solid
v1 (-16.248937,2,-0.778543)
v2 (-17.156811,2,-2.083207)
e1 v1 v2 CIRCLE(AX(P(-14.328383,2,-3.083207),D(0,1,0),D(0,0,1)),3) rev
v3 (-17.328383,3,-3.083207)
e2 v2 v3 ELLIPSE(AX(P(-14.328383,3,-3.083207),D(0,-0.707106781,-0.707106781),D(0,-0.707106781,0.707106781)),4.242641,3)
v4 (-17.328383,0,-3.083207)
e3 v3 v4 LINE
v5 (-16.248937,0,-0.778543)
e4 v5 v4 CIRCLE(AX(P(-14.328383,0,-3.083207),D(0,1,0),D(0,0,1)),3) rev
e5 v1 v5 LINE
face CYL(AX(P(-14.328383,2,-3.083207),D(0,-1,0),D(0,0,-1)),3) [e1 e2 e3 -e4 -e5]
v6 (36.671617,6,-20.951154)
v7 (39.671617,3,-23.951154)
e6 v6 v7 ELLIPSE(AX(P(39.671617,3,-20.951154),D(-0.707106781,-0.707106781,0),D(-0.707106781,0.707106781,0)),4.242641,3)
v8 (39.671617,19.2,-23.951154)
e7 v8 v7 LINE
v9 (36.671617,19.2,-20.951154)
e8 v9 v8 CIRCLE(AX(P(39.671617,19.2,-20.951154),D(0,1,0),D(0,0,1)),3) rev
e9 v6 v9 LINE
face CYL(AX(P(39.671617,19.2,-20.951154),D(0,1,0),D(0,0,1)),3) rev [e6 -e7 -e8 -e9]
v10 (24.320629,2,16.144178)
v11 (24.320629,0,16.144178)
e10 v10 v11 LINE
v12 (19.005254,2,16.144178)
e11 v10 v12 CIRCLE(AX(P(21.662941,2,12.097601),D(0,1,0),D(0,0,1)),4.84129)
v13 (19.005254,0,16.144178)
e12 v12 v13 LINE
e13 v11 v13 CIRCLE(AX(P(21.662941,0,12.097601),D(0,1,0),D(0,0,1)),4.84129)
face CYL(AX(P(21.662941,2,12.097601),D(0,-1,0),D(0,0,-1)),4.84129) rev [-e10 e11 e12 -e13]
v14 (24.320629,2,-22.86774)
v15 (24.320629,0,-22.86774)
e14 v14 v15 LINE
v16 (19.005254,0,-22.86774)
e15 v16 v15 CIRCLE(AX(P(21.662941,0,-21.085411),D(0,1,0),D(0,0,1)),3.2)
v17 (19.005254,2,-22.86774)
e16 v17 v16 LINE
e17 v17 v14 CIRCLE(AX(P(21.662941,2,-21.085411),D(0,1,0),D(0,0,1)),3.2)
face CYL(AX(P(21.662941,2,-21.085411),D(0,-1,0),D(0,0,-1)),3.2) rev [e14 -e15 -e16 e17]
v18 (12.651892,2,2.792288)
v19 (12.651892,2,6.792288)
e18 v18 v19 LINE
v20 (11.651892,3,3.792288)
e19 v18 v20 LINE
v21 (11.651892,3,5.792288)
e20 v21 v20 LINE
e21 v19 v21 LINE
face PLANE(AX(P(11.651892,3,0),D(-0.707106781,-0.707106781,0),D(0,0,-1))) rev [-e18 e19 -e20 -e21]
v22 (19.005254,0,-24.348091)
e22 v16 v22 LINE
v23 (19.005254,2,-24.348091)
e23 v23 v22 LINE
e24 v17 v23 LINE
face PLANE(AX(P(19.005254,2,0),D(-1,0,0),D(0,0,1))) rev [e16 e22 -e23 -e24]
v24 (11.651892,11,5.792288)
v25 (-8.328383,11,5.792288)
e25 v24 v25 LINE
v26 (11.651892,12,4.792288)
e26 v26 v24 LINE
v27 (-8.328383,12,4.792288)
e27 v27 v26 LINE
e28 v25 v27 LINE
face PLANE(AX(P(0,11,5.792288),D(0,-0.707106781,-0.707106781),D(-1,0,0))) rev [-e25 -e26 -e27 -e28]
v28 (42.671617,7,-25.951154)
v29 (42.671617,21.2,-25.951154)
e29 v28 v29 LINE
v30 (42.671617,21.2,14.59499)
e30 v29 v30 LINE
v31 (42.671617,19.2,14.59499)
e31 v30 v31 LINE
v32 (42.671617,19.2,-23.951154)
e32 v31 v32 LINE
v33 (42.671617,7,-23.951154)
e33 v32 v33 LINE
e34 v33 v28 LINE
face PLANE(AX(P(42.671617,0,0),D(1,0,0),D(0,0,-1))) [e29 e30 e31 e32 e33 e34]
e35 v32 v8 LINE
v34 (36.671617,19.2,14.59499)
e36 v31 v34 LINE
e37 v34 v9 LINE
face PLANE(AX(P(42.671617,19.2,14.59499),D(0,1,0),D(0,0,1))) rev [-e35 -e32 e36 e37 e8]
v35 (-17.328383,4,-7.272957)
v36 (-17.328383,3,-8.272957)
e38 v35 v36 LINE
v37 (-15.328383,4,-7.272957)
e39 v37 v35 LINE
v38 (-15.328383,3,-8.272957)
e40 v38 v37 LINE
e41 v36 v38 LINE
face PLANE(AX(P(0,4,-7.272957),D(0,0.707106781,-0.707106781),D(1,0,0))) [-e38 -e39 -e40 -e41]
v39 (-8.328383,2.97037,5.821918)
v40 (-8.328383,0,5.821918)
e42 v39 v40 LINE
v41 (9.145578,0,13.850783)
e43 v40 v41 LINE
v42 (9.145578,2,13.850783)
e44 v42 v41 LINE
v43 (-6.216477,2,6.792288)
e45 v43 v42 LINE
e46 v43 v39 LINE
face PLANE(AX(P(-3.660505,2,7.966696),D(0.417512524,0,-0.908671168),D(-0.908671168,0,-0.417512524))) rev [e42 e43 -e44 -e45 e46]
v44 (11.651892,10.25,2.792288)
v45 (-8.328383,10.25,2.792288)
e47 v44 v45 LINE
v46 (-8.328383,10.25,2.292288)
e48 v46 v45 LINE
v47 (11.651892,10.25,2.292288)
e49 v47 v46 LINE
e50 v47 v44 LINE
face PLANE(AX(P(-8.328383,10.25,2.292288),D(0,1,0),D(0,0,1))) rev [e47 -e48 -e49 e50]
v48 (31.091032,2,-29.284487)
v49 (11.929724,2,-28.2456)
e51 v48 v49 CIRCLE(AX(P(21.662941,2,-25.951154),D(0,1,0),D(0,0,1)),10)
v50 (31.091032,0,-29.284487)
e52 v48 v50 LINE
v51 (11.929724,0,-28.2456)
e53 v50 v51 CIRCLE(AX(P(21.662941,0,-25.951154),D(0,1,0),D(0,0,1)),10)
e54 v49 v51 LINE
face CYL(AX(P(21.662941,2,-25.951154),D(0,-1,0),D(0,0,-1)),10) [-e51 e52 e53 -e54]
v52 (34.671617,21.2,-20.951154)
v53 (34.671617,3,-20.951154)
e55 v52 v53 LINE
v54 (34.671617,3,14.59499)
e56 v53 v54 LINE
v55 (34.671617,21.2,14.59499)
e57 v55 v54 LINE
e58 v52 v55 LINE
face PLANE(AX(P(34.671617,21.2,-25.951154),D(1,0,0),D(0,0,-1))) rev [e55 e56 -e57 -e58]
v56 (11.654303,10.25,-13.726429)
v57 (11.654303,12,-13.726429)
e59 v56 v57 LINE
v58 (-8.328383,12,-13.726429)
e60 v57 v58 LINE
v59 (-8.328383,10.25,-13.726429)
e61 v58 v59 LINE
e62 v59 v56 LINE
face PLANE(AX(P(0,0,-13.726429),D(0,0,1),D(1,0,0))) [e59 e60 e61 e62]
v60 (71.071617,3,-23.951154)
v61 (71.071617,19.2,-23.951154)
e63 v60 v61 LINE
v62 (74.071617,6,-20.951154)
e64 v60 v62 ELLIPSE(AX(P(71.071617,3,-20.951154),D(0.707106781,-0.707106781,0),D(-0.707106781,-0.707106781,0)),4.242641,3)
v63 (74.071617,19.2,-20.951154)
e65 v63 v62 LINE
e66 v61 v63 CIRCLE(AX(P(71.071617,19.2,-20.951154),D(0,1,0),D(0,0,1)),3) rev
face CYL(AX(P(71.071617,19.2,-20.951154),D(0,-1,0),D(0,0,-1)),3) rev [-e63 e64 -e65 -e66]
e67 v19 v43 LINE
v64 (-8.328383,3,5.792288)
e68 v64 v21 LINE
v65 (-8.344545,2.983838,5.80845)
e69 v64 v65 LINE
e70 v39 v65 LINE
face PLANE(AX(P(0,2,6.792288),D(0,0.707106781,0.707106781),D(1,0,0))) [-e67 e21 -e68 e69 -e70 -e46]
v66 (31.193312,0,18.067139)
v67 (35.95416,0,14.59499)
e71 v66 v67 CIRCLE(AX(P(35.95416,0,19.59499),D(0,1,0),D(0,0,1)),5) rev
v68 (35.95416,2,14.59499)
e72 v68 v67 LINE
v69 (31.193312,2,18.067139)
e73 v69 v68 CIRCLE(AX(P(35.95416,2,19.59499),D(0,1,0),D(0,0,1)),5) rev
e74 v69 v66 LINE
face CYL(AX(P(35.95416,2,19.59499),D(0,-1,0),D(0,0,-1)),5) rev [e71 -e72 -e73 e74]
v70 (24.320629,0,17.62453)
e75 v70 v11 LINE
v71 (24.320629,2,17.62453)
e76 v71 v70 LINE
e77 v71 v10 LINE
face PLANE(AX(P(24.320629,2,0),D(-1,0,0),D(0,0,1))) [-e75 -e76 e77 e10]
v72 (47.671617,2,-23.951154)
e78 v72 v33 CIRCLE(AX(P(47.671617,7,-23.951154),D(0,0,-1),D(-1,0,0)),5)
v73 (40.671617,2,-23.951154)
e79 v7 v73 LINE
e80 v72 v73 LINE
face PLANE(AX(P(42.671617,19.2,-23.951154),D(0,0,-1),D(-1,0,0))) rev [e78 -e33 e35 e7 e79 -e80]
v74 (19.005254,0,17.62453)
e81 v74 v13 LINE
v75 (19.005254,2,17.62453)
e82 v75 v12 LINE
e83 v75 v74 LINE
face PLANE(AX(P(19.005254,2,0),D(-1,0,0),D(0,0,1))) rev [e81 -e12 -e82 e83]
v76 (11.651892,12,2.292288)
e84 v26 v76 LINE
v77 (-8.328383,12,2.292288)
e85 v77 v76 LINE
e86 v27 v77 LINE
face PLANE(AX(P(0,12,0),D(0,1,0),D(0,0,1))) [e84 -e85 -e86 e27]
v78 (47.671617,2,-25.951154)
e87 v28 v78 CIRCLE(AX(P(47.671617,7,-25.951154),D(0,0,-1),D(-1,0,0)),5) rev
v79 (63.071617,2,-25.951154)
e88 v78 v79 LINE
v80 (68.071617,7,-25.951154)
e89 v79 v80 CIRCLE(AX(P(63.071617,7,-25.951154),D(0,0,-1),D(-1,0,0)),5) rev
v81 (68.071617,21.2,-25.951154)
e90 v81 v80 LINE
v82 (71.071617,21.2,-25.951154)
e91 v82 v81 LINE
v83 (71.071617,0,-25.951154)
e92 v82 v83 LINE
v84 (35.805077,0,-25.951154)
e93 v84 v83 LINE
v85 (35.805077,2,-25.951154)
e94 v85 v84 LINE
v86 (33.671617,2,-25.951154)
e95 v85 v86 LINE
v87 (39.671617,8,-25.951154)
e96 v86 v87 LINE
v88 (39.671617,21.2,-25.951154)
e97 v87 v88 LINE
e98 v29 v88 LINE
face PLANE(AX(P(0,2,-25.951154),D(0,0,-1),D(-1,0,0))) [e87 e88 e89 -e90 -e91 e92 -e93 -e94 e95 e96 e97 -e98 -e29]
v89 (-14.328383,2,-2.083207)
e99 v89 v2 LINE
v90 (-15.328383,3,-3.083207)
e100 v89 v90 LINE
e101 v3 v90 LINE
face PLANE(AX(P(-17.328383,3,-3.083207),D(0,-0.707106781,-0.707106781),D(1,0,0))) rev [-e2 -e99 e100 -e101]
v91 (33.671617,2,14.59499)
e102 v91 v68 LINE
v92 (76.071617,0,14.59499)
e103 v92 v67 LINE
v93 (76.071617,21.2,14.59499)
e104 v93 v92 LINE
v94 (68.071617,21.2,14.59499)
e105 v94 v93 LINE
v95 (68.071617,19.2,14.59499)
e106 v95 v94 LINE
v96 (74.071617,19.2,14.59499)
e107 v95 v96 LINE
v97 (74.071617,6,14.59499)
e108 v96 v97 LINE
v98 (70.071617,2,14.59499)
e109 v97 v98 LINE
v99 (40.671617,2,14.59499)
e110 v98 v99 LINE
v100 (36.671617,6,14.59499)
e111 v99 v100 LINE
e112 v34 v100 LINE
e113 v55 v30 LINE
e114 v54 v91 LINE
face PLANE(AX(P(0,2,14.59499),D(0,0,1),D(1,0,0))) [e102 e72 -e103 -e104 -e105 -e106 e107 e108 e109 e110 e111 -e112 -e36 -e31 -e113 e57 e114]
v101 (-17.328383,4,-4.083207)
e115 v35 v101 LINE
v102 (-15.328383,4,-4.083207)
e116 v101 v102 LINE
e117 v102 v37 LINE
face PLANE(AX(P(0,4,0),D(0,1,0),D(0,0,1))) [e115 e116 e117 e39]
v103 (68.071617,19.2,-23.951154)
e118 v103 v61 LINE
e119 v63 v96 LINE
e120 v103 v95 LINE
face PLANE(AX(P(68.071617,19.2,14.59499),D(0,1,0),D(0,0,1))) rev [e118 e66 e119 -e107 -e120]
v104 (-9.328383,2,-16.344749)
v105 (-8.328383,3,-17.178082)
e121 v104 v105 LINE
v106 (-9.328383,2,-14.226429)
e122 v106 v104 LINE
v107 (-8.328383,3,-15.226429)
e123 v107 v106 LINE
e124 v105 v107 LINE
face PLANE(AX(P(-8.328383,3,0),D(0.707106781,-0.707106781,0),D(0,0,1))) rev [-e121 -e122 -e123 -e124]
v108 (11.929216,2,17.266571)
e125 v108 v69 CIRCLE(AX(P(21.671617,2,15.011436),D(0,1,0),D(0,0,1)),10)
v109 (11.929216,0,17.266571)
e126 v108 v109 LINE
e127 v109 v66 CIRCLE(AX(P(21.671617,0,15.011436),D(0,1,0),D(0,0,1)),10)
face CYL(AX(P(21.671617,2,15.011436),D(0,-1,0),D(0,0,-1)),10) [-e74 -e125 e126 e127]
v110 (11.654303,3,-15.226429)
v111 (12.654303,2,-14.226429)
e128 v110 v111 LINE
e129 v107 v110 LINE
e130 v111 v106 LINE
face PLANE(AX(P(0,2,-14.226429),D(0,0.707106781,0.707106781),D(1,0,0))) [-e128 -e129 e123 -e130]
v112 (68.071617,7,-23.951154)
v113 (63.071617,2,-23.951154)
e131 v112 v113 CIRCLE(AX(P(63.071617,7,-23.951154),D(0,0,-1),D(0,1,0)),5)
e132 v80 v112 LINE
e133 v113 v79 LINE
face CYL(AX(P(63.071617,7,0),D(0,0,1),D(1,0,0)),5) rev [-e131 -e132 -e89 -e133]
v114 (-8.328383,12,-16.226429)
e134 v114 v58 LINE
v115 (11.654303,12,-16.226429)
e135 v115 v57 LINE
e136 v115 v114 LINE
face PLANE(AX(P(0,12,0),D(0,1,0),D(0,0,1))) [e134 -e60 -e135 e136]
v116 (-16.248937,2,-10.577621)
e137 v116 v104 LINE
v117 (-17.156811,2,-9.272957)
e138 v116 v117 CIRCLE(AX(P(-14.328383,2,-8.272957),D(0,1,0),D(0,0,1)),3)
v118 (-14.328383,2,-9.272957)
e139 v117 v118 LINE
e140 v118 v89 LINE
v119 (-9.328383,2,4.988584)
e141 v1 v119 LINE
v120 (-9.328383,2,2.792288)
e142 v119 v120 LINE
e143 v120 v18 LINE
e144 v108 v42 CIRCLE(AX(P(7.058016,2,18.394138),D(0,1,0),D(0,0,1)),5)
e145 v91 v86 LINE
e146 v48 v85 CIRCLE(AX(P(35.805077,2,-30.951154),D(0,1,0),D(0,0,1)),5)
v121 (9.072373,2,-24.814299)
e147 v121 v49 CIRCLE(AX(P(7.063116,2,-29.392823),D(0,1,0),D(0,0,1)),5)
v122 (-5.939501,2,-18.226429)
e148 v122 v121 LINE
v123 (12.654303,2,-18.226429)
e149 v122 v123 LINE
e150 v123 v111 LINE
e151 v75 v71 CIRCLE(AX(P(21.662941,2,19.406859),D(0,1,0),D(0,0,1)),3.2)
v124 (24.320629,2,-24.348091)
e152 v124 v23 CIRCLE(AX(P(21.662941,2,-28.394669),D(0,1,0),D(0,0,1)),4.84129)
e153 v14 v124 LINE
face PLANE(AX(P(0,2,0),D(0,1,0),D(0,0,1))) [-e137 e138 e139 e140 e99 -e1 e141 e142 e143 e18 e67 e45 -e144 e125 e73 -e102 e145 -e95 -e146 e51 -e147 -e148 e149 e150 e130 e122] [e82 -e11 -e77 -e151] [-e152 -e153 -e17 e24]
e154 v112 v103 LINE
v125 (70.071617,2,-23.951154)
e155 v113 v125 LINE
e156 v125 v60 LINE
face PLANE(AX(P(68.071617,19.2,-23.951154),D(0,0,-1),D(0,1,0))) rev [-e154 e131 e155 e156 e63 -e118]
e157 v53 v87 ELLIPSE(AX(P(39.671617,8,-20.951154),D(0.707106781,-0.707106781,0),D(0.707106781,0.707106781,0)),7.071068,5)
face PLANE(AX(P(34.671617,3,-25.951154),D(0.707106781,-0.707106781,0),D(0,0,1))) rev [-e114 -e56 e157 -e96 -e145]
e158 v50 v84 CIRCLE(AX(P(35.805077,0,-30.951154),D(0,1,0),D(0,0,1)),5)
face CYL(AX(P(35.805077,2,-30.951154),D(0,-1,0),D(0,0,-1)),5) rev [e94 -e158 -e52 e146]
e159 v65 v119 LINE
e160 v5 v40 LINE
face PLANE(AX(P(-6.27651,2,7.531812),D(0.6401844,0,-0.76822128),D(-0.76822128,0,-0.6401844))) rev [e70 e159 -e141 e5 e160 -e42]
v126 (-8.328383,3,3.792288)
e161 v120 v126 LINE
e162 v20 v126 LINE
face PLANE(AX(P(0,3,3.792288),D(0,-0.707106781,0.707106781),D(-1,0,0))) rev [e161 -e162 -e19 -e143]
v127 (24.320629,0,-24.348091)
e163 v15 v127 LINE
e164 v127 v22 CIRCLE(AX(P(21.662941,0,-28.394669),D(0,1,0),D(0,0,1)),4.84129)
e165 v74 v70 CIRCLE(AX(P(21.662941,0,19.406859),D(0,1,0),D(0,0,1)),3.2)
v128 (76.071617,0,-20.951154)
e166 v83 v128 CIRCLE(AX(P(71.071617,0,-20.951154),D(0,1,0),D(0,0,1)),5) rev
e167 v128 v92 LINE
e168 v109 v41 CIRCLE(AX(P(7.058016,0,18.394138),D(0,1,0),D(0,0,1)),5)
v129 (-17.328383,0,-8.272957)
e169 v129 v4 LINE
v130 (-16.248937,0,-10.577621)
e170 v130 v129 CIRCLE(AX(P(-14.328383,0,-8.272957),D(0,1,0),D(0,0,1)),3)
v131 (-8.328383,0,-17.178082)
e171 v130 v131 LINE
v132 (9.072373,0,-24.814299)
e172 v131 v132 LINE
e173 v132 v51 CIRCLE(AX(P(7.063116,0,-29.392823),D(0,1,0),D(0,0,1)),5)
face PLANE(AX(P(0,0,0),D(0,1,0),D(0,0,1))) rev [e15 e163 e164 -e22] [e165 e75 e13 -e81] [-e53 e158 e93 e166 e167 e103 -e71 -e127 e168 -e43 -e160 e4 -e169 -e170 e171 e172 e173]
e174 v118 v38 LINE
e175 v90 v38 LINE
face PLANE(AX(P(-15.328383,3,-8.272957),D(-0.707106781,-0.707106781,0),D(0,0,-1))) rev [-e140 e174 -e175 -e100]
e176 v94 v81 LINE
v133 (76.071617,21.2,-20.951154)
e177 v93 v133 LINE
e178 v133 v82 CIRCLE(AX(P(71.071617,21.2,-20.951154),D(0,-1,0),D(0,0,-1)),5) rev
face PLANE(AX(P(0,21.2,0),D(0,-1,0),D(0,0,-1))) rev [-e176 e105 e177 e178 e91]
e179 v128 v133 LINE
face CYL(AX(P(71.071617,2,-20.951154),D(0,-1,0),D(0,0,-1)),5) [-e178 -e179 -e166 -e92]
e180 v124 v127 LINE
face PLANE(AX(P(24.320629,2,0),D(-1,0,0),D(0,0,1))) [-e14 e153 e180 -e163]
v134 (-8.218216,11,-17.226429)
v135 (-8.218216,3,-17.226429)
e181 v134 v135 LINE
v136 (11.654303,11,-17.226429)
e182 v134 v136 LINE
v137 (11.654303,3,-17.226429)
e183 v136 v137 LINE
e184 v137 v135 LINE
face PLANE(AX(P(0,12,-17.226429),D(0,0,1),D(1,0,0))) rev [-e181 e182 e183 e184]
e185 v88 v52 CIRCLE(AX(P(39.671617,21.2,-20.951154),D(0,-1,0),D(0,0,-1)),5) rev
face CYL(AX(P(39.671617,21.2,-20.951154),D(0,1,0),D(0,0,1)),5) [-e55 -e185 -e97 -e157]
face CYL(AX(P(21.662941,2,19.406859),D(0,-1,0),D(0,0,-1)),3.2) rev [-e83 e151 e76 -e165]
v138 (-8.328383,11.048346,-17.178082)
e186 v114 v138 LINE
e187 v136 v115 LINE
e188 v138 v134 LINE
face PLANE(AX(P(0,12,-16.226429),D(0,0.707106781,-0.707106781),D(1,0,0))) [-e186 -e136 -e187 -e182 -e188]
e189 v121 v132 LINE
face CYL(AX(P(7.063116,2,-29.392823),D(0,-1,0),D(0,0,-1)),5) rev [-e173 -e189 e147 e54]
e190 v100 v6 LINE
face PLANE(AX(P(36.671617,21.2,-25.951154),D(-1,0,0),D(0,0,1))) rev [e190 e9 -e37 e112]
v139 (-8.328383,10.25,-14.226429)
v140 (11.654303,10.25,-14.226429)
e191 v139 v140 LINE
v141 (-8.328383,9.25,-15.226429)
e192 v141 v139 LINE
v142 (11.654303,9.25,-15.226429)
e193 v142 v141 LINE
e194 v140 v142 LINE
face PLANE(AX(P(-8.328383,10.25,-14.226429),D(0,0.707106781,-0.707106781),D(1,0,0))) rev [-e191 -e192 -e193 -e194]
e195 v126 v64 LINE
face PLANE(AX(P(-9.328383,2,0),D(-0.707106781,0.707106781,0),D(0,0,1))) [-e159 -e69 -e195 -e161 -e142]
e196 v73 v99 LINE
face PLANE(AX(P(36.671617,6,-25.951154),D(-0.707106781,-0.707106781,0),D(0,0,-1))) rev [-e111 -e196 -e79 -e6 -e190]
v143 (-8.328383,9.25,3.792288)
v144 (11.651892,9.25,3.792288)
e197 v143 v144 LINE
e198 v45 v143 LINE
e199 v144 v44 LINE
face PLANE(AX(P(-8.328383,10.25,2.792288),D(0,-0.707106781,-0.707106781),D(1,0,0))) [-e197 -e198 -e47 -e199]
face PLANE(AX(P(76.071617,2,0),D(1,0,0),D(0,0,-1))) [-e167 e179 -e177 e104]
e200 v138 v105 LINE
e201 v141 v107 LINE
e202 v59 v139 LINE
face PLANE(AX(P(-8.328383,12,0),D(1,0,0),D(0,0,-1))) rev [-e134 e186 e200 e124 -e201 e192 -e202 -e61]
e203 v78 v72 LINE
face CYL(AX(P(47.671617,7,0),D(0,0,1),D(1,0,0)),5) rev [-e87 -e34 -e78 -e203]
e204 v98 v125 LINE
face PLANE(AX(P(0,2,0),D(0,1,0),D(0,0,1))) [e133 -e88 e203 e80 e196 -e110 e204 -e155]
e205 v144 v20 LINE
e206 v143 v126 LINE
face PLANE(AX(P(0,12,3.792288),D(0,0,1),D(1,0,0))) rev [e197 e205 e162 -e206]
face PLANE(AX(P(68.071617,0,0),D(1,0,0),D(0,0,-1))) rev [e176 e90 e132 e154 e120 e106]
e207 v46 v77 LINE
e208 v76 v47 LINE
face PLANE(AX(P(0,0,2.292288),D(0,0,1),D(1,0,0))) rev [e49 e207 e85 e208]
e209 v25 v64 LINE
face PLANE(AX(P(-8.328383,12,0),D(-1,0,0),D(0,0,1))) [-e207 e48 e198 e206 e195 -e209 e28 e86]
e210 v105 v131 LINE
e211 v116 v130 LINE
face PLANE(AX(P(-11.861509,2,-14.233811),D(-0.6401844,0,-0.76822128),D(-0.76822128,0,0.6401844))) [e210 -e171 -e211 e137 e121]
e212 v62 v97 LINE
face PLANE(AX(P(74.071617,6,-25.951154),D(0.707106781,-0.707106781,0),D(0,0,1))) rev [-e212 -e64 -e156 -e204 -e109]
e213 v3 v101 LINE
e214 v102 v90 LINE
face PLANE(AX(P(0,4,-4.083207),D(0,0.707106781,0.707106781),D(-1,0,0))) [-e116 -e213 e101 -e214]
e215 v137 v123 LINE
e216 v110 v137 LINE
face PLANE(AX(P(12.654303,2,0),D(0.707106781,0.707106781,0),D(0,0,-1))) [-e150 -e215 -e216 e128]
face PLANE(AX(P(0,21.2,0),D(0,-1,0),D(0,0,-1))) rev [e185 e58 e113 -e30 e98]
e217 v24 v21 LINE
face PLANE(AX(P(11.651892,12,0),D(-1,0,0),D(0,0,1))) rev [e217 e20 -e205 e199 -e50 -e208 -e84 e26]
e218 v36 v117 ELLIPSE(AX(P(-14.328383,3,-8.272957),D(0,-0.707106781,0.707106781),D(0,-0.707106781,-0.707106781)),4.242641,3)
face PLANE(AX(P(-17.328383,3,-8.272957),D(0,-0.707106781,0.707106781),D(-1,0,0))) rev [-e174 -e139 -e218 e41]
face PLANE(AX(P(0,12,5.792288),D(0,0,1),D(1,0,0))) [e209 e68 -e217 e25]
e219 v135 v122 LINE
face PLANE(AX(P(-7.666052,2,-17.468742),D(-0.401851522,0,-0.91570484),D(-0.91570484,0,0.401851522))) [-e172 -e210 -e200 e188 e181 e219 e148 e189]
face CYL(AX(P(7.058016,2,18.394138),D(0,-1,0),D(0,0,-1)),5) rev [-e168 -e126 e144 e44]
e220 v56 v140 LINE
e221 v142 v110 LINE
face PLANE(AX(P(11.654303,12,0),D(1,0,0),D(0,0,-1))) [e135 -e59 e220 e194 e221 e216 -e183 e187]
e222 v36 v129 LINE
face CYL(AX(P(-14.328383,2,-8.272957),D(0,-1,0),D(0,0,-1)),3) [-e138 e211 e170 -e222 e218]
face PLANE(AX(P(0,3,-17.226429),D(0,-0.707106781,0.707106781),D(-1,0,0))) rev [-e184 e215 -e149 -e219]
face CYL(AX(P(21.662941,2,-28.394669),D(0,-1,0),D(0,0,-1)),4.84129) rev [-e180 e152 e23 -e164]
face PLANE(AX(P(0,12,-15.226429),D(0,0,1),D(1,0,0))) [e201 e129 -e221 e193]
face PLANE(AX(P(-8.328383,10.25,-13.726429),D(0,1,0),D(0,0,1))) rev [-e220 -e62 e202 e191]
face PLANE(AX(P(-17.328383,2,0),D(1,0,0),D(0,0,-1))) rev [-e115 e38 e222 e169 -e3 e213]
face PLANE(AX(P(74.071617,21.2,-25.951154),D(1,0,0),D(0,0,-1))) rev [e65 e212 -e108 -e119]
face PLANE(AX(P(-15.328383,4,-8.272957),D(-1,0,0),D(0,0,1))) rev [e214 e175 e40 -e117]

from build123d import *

# Parameters (mm, degrees)
BOSS_EXTRUDE3_DEPTH  = 2
SKETCH2_W            = 19.980275276
SKETCH2_H            = 2
BOSS_EXTRUDE4_DEPTH  = 10
SKETCH4_W            = 19.982686102
SKETCH4_H            = 1.75
BOSS_EXTRUDE6_DEPTH  = 1.5
SKETCH5_W            = 19.980275276
SKETCH5_H            = 1.75
BOSS_EXTRUDE7_DEPTH  = 1.5
SKETCH6_W            = 2
SKETCH6_H            = 40.546143633
BOSS_EXTRUDE8_DEPTH  = 19.2
SKETCH7_W            = 40.546143633
SKETCH7_H            = 2
BOSS_EXTRUDE9_DEPTH  = 6
SKETCH8_W            = 40.546143633
SKETCH8_H            = 2
BOSS_EXTRUDE10_DEPTH = 6
SKETCH9_W            = 2
SKETCH9_H            = 17.2
BOSS_EXTRUDE11_DEPTH = 6
SKETCH11_W           = 2
SKETCH11_H           = 17.2
BOSS_EXTRUDE12_DEPTH = 6
CHAMFER3_SIZE        = 1
FILLET6_R            = 3
FILLET12_R           = 5
FILLET13_R           = 5
CHAMFER4_SIZE        = 4
SKETCH12_W           = 2
SKETCH12_H           = 5.189750324
BOSS_EXTRUDE13_DEPTH = 2
CHAMFER5_SIZE        = 1


with BuildPart() as part:
    # Sketch1 → Boss-Extrude3 (new body)
    with BuildSketch(Plane(origin=(0, 0, 0), x_dir=(1, 0, 0), z_dir=(0, 1, 0))):
        with BuildLine():
            Line((-8.328383402, 17.178082192), (-11.926539406, 14.179618856))
            Line((-11.926539406, 14.179618856), (-16.248936601, 10.577621193))
            ThreePointArc((-16.248936601, 10.577621193), (-17.045151666, 9.545423543), (-17.328383402, 8.272957354))
            Line((-17.328383402, 8.272957354), (-17.328383402, 3.08320703))
            ThreePointArc((-17.328383402, 3.08320703), (-17.045151666, 1.810740841), (-16.248936601, 0.778543191))
            Line((-16.248936601, 0.778543191), (-11.926539406, -2.823454472))
            Line((-11.926539406, -2.823454472), (-8.328383402, -5.821917808))
            Line((-8.328383402, -5.821917808), (9.145578492, -13.850782578))
            ThreePointArc((9.145578492, -13.850782578), (10.93396709, -15.23549913), (11.929216114, -17.266571036))
            ThreePointArc((11.929216114, -17.266571036), (21.256400089, -25.002812312), (31.193312026, -18.067138506))
            ThreePointArc((31.193312026, -18.067138506), (33.007912602, -15.555233716), (35.954159741, -14.594989625))
            Line((35.954159741, -14.594989625), (36.671616598, -14.594989625))
            Line((36.671616598, -14.594989625), (76.071616598, -14.594989625))
            Line((76.071616598, -14.594989625), (76.071616598, 25.951154008))
            Line((76.071616598, 25.951154008), (36.671616598, 25.951154008))
            Line((36.671616598, 25.951154008), (35.805077068, 25.951154008))
            ThreePointArc((35.805077068, 25.951154008), (32.918325722, 26.868671104), (31.09103186, 29.284487342))
            ThreePointArc((31.09103186, 29.284487342), (21.121556826, 35.936488389), (11.929724224, 28.245600027))
            ThreePointArc((11.929724224, 28.245600027), (10.905359885, 26.19326698), (9.072373225, 24.814298837))
            Line((9.072373225, 24.814298837), (-8.328383402, 17.178082192))
        make_face()
        with BuildLine():
            Line((24.320629097, -16.144178085), (24.320629097, -17.62452967))
            ThreePointArc((24.320629097, -17.62452967), (21.662941444, -22.60685858), (19.005253792, -17.62452967))
            Line((19.005253792, -17.62452967), (19.005253792, -16.144178085))
            ThreePointArc((19.005253792, -16.144178085), (21.662941444, -7.256310151), (24.320629097, -16.144178085))
        make_face(mode=Mode.SUBTRACT)
        with BuildLine():
            Line((24.320629097, 24.348091169), (24.320629097, 22.867739584))
            ThreePointArc((24.320629097, 22.867739584), (21.662941444, 17.885410674), (19.005253792, 22.867739584))
            Line((19.005253792, 22.867739584), (19.005253792, 24.348091169))
            ThreePointArc((19.005253792, 24.348091169), (21.662941444, 33.235959102), (24.320629097, 24.348091169))
        make_face(mode=Mode.SUBTRACT)
    extrude(amount=BOSS_EXTRUDE3_DEPTH)

    # Sketch2 → Boss-Extrude4 (add)
    with BuildSketch(Plane(origin=(0, 2, 0), x_dir=(1, 0, 0), z_dir=(0, 1, 0))):
        Polygon((11.6543027, 15.226428568), (11.6543027, 17.226428568), (-8.218215819, 17.226428568), (-8.328383402, 17.178082192), (-8.328383402, 15.226428568), align=None)
        with Locations((1.661754236, -4.792288058)):
            Rectangle(SKETCH2_W, SKETCH2_H)
    extrude(amount=BOSS_EXTRUDE4_DEPTH)

    # Sketch4 → Boss-Extrude6 (add)
    with BuildSketch(Plane.XY.offset(-15.226428568)):
        with Locations((1.662959649, 11.125)):
            Rectangle(SKETCH4_W, SKETCH4_H)
    extrude(amount=BOSS_EXTRUDE6_DEPTH)

    # Sketch5 → Boss-Extrude7 (add)
    with BuildSketch(Plane(origin=(0, 0, 3.792288058), x_dir=(-1, 0, 0), z_dir=(0, 0, -1))):
        with Locations((-1.661754236, 11.125)):
            Rectangle(SKETCH5_W, SKETCH5_H)
    extrude(amount=BOSS_EXTRUDE7_DEPTH)

    # Sketch6 → Boss-Extrude8 (add)
    with BuildSketch(Plane(origin=(0, 2, 0), x_dir=(1, 0, 0), z_dir=(0, 1, 0))):
        with Locations((35.671616598, 5.678082192)):
            Rectangle(SKETCH6_W, SKETCH6_H)
        with Locations((75.071616598, 5.678082192)):
            Rectangle(SKETCH6_W, SKETCH6_H)
    extrude(amount=BOSS_EXTRUDE8_DEPTH)

    # Sketch7 → Boss-Extrude9 (add)
    with BuildSketch(Plane.ZY.offset(-74.071616598)):
        with Locations((-5.678082192, 20.2)):
            Rectangle(SKETCH7_W, SKETCH7_H)
    extrude(amount=BOSS_EXTRUDE9_DEPTH)

    # Sketch8 → Boss-Extrude10 (add)
    with BuildSketch(Plane(origin=(36.671616598, 0, 0), x_dir=(0, 0, -1), z_dir=(1, 0, 0))):
        with Locations((5.678082192, 20.2)):
            Rectangle(SKETCH8_W, SKETCH8_H)
    extrude(amount=BOSS_EXTRUDE10_DEPTH)

    # Sketch9 → Boss-Extrude11 (add)
    with BuildSketch(Plane(origin=(36.671616598, 0, 0), x_dir=(0, 0, -1), z_dir=(1, 0, 0))):
        with Locations((24.951154008, 10.6)):
            Rectangle(SKETCH9_W, SKETCH9_H)
    extrude(amount=BOSS_EXTRUDE11_DEPTH)

    # Sketch11 → Boss-Extrude12 (add)
    with BuildSketch(Plane.ZY.offset(-74.071616598)):
        with Locations((-24.951154008, 10.6)):
            Rectangle(SKETCH11_W, SKETCH11_H)
    extrude(amount=BOSS_EXTRUDE12_DEPTH)

    # Chamfer3
    # the kernel refuses this chamfer: 1 mm, written as the material it adds along each edge
    with BuildSketch(Plane(origin=(34.671616598, 2, -25.951154008), x_dir=(-1, 0, 0), z_dir=(0, 0, 1))) as chamfer3_piece_1:
        Polygon((CHAMFER3_SIZE, 0), (0, -CHAMFER3_SIZE), (0, 0), align=None)
    extrude(amount=40.546143633)
    with BuildSketch(Plane(origin=(11.651891874, 2, 5.792288058), x_dir=(0, 0, 1), z_dir=(-1, 0, 0))) as chamfer3_piece_2_section:
        Polygon((CHAMFER3_SIZE, 0), (0, CHAMFER3_SIZE), (0, 0), align=None)
    chamfer3_piece_2 = extrude(amount=19.980275276, mode=Mode.PRIVATE)
    chamfer3_piece_2 = split(chamfer3_piece_2, bisect_by=Plane(origin=(8.15775509, 2, 13.396901508), z_dir=(0.4175125238289849, 0, -0.9086711684905334)), keep=Keep.TOP, mode=Mode.PRIVATE)
    add(chamfer3_piece_2)
    with BuildSketch(Plane(origin=(11.6543027, 2, -17.226428568), x_dir=(0, 0, -1), z_dir=(-1, 0, 0))) as chamfer3_piece_3_section:
        Polygon((CHAMFER3_SIZE, 0), (0, -CHAMFER3_SIZE), (0, 0), align=None)
    chamfer3_piece_3 = extrude(amount=22.444201507, mode=Mode.PRIVATE)
    chamfer3_piece_3 = split(chamfer3_piece_3, bisect_by=Plane(origin=(8.445196081, 2, -24.539065946), z_dir=(0.40185152236711835, 0, 0.9157048399846042)), keep=Keep.TOP, mode=Mode.PRIVATE)
    add(chamfer3_piece_3)

    # Fillet6
    fillet6_edges = [part.edges().sort_by_distance(p)[0] for p in [
        (36.671616598, 10.6, -23.951154008),
        (74.071616598, 10.6, -23.951154008),
    ]]
    fillet(fillet6_edges, radius=FILLET6_R)

    # Fillet12
    fillet12_edges = [part.edges().sort_by_distance(p)[0] for p in [
        (34.671616598, 12.1, -25.951154008),
        (76.071616598, 10.6, -25.951154008),
    ]]
    fillet(fillet12_edges, radius=FILLET12_R)

    # Fillet13
    fillet13_edges = [part.edges().sort_by_distance(p)[0] for p in [
        (42.671616598, 2, -24.951154008),
        (68.071616598, 2, -24.951154008),
    ]]
    fillet(fillet13_edges, radius=FILLET13_R)

    # Chamfer4
    # the kernel refuses this chamfer: 4 mm, written as the material it adds along each edge
    with BuildSketch(Plane(origin=(74.071616598, 2, -31.23788596), x_dir=(-1, 0, 0), z_dir=(0, 0, 1))) as chamfer4_piece_1_section:
        Polygon((CHAMFER4_SIZE, 0), (0, -CHAMFER4_SIZE), (0, 0), align=None)
    chamfer4_piece_1 = extrude(amount=45.832875585, mode=Mode.PRIVATE)
    chamfer4_piece_1 = split(chamfer4_piece_1, bisect_by=Plane(origin=(74.071616598, 2, -23.951154008), z_dir=(0, 0, 1)), keep=Keep.TOP, mode=Mode.PRIVATE)
    add(chamfer4_piece_1)
    with BuildSketch(Plane(origin=(36.671616598, 2, 14.594989625), x_dir=(1, 0, 0), z_dir=(0, 0, -1))) as chamfer4_piece_2_section:
        Polygon((CHAMFER4_SIZE, 0), (0, -CHAMFER4_SIZE), (0, 0), align=None)
    chamfer4_piece_2 = extrude(amount=45.832875585, mode=Mode.PRIVATE)
    chamfer4_piece_2 = split(chamfer4_piece_2, bisect_by=Plane(origin=(36.671616598, 2, -23.951154008), z_dir=(0, 0, 1)), keep=Keep.TOP, mode=Mode.PRIVATE)
    add(chamfer4_piece_2)

    # Sketch12 → Boss-Extrude13 (add)
    with BuildSketch(Plane(origin=(0, 2, 0), x_dir=(1, 0, 0), z_dir=(0, 1, 0))):
        with Locations((-16.328383402, 5.678082192)):
            Rectangle(SKETCH12_W, SKETCH12_H)
    extrude(amount=BOSS_EXTRUDE13_DEPTH)

    # Chamfer5
    # the kernel refuses this chamfer: 1 mm, written as the material it adds along each edge
    with BuildSketch(Plane(origin=(11.651891874, 10.25, 3.792288058), x_dir=(0, -1, 0), z_dir=(-1, 0, 0))) as chamfer5_piece_1:
        Polygon((CHAMFER5_SIZE, 0), (0, -CHAMFER5_SIZE), (0, 0), align=None)
    extrude(amount=19.980275276)
    with BuildSketch(Plane(origin=(11.6543027, 10.25, -15.226428568), x_dir=(0, -1, 0), z_dir=(-1, 0, 0))) as chamfer5_piece_2:
        Polygon((CHAMFER5_SIZE, 0), (0, CHAMFER5_SIZE), (0, 0), align=None)
    extrude(amount=19.982686102)
    with BuildSketch(Plane(origin=(11.6543027, 2, -15.226428568), x_dir=(1, 0, 0), z_dir=(0, 0, -1))) as chamfer5_piece_3_section:
        Polygon((CHAMFER5_SIZE, 0), (0, -CHAMFER5_SIZE), (0, 0), align=None)
    chamfer5_piece_3 = extrude(amount=5.571682988, mode=Mode.PRIVATE)
    chamfer5_piece_3 = split(chamfer5_piece_3, bisect_by=Plane(origin=(11.6543027, 3.5, -16.726428568), z_dir=(0, -0.7071067811865476, 0.7071067811865476)), keep=Keep.TOP, mode=Mode.PRIVATE)
    add(chamfer5_piece_3)
    with BuildSketch(Plane(origin=(-8.328383402, 2, -15.226428568), x_dir=(0, 0, 1), z_dir=(1, 0, 0))) as chamfer5_piece_4:
        Polygon((CHAMFER5_SIZE, 0), (0, -CHAMFER5_SIZE), (0, 0), align=None)
    extrude(amount=19.982686102)
    with BuildSketch(Plane(origin=(-8.328383402, 2, -19.74976518), x_dir=(-1, 0, 0), z_dir=(0, 0, 1))) as chamfer5_piece_5_section:
        Polygon((CHAMFER5_SIZE, 0), (0, -CHAMFER5_SIZE), (0, 0), align=None)
    chamfer5_piece_5 = extrude(amount=4.523336611, mode=Mode.PRIVATE)
    chamfer5_piece_5 = split(chamfer5_piece_5, bisect_by=Plane(origin=(-7.063621277, 2, -18.232050629), z_dir=(0.6401843996644802, 0, 0.7682212795973757)), keep=Keep.TOP, mode=Mode.PRIVATE)
    add(chamfer5_piece_5)
    with BuildSketch(Plane(origin=(11.651891874, 2, 9.363971046), x_dir=(1, 0, 0), z_dir=(0, 0, -1))) as chamfer5_piece_6_section:
        Polygon((CHAMFER5_SIZE, 0), (0, -CHAMFER5_SIZE), (0, 0), align=None)
    chamfer5_piece_6 = extrude(amount=5.571682988, mode=Mode.PRIVATE)
    chamfer5_piece_6 = split(chamfer5_piece_6, bisect_by=Plane(origin=(11.651891874, 0.714158506, 8.078129552), z_dir=(0, -0.7071067811865476, -0.7071067811865476)), keep=Keep.TOP, mode=Mode.PRIVATE)
    add(chamfer5_piece_6)
    with BuildSketch(Plane(origin=(-8.328383402, 2, 3.792288058), x_dir=(-1, 0, 0), z_dir=(0, 0, 1))) as chamfer5_piece_7_section:
        Polygon((CHAMFER5_SIZE, 0), (0, -CHAMFER5_SIZE), (0, 0), align=None)
    chamfer5_piece_7 = extrude(amount=4.601312738, mode=Mode.PRIVATE)
    chamfer5_piece_7 = split(chamfer5_piece_7, bisect_by=Plane(origin=(-8.328383402, 3.5, 5.292288058), z_dir=(0, -0.7071067811865476, -0.7071067811865476)), keep=Keep.TOP, mode=Mode.PRIVATE)
    chamfer5_piece_7 = split(chamfer5_piece_7, bisect_by=Plane(origin=(-9.326561968, 2, 4.990102337), z_dir=(0.6401843996644799, 0, -0.7682212795973757)), keep=Keep.TOP, mode=Mode.PRIVATE)
    add(chamfer5_piece_7)
    with BuildSketch(Plane(origin=(-8.328383402, 2, 3.792288058), x_dir=(0, 0, -1), z_dir=(1, 0, 0))) as chamfer5_piece_8:
        Polygon((CHAMFER5_SIZE, 0), (0, CHAMFER5_SIZE), (0, 0), align=None)
    extrude(amount=19.980275276)
    with BuildSketch(Plane(origin=(-19.90006639, 2, -8.272957354), x_dir=(0, 0, -1), z_dir=(1, 0, 0))) as chamfer5_piece_9_section:
        Polygon((CHAMFER5_SIZE, 0), (0, CHAMFER5_SIZE), (0, 0), align=None)
    chamfer5_piece_9 = extrude(amount=4.571682988, mode=Mode.PRIVATE)
    chamfer5_piece_9 = chamfer5_piece_9 & Plane(origin=(-14.328383402, 2, -8.272957354), x_dir=(-0.6401843996644775, 0, -0.7682212795973778), z_dir=(0, -1, 0)) * Cylinder(3, 14, mode=Mode.PRIVATE)
    add(chamfer5_piece_9)
    with BuildSketch(Plane(origin=(-15.328383402, 2, -8.272957354), x_dir=(1, 0, 0), z_dir=(0, 0, 1))) as chamfer5_piece_10:
        Polygon((CHAMFER5_SIZE, 0), (0, CHAMFER5_SIZE), (0, 0), align=None)
    extrude(amount=5.189750324)
    with BuildSketch(Plane(origin=(-15.328383402, 2, -3.08320703), x_dir=(0, 0, 1), z_dir=(-1, 0, 0))) as chamfer5_piece_11_section:
        Polygon((CHAMFER5_SIZE, 0), (0, CHAMFER5_SIZE), (0, 0), align=None)
    chamfer5_piece_11 = extrude(amount=4.571682988, mode=Mode.PRIVATE)
    chamfer5_piece_11 = chamfer5_piece_11 & Plane(origin=(-14.328383402, 2, -3.08320703), x_dir=(-1, 0, 0), z_dir=(0, -1, 0)) * Cylinder(3, 14, mode=Mode.PRIVATE)
    add(chamfer5_piece_11)
    with BuildSketch(Plane(origin=(-8.328383402, 2, -15.226428568), x_dir=(0, 0, 1), z_dir=(1, 0, 0))) as chamfer5_piece_12a_section:
        Polygon((CHAMFER5_SIZE, 0), (0, -CHAMFER5_SIZE), (0, 0), align=None)
    chamfer5_piece_12a = extrude(amount=22.55436909, mode=Mode.PRIVATE)
    chamfer5_piece_12a = split(chamfer5_piece_12a, bisect_by=Plane(origin=(11.6543027, 2, -15.226428568), z_dir=(1, 0, 0)), keep=Keep.TOP, mode=Mode.PRIVATE)
    with BuildSketch(Plane(origin=(11.6543027, 2, -12.65474558), x_dir=(1, 0, 0), z_dir=(0, 0, -1))) as chamfer5_piece_12b_section:
        Polygon((CHAMFER5_SIZE, 0), (0, -CHAMFER5_SIZE), (0, 0), align=None)
    chamfer5_piece_12b = extrude(amount=8.143365976, mode=Mode.PRIVATE)
    chamfer5_piece_12b = split(chamfer5_piece_12b, bisect_by=Plane(origin=(11.6543027, 2, -15.226428568), z_dir=(0, 0, 1)), keep=Keep.TOP, mode=Mode.PRIVATE)
    chamfer5_piece_12 = chamfer5_piece_12a & chamfer5_piece_12b
    add(chamfer5_piece_12)
    with BuildSketch(Plane(origin=(-8.328383402, 2, -19.74976518), x_dir=(-1, 0, 0), z_dir=(0, 0, 1))) as chamfer5_piece_13a_section:
        Polygon((CHAMFER5_SIZE, 0), (0, -CHAMFER5_SIZE), (0, 0), align=None)
    chamfer5_piece_13a = extrude(amount=7.095019599, mode=Mode.PRIVATE)
    chamfer5_piece_13a = split(chamfer5_piece_13a, bisect_by=Plane(origin=(-8.328383402, 2, -15.226428568), z_dir=(0, 0, 1)), keep=Keep.TOP, mode=Mode.PRIVATE)
    with BuildSketch(Plane(origin=(-10.90006639, 2, -15.226428568), x_dir=(0, 0, 1), z_dir=(1, 0, 0))) as chamfer5_piece_13b_section:
        Polygon((CHAMFER5_SIZE, 0), (0, -CHAMFER5_SIZE), (0, 0), align=None)
    chamfer5_piece_13b = extrude(amount=22.55436909, mode=Mode.PRIVATE)
    chamfer5_piece_13b = split(chamfer5_piece_13b, bisect_by=Plane(origin=(-10.805927603, 2, -15.113462024), z_dir=(0.6401843996644802, 0, 0.7682212795973757)), keep=Keep.TOP, mode=Mode.PRIVATE)
    chamfer5_piece_13b = split(chamfer5_piece_13b, bisect_by=Plane(origin=(-8.328383402, 2, -15.226428568), z_dir=(-1, 0, 0)), keep=Keep.TOP, mode=Mode.PRIVATE)
    chamfer5_piece_13 = chamfer5_piece_13a & chamfer5_piece_13b
    add(chamfer5_piece_13)
    with BuildSketch(Plane(origin=(11.651891874, 2, 9.363971046), x_dir=(1, 0, 0), z_dir=(0, 0, -1))) as chamfer5_piece_14a_section:
        Polygon((CHAMFER5_SIZE, 0), (0, -CHAMFER5_SIZE), (0, 0), align=None)
    chamfer5_piece_14a = extrude(amount=8.143365976, mode=Mode.PRIVATE)
    chamfer5_piece_14a = split(chamfer5_piece_14a, bisect_by=Plane(origin=(11.651891874, 2, 3.792288058), z_dir=(0, 0, -1)), keep=Keep.TOP, mode=Mode.PRIVATE)
    with BuildSketch(Plane(origin=(-8.328383402, 2, 3.792288058), x_dir=(0, 0, -1), z_dir=(1, 0, 0))) as chamfer5_piece_14b_section:
        Polygon((CHAMFER5_SIZE, 0), (0, CHAMFER5_SIZE), (0, 0), align=None)
    chamfer5_piece_14b = extrude(amount=22.551958264, mode=Mode.PRIVATE)
    chamfer5_piece_14b = split(chamfer5_piece_14b, bisect_by=Plane(origin=(11.651891874, 2, 3.792288058), z_dir=(1, 0, 0)), keep=Keep.TOP, mode=Mode.PRIVATE)
    chamfer5_piece_14 = chamfer5_piece_14a & chamfer5_piece_14b
    add(chamfer5_piece_14)
    with BuildSketch(Plane(origin=(-10.90006639, 2, 3.792288058), x_dir=(0, 0, -1), z_dir=(1, 0, 0))) as chamfer5_piece_15a_section:
        Polygon((CHAMFER5_SIZE, 0), (0, CHAMFER5_SIZE), (0, 0), align=None)
    chamfer5_piece_15a = extrude(amount=22.551958264, mode=Mode.PRIVATE)
    chamfer5_piece_15a = split(chamfer5_piece_15a, bisect_by=Plane(origin=(-8.328383402, 2, 3.792288058), z_dir=(-1, 0, 0)), keep=Keep.TOP, mode=Mode.PRIVATE)
    chamfer5_piece_15a = split(chamfer5_piece_15a, bisect_by=Plane(origin=(-10.844276518, 2, 3.725340212), z_dir=(0.6401843996644799, 0, -0.7682212795973757)), keep=Keep.TOP, mode=Mode.PRIVATE)
    with BuildSketch(Plane(origin=(-8.328383402, 2, 1.22060507), x_dir=(-1, 0, 0), z_dir=(0, 0, 1))) as chamfer5_piece_15b_section:
        Polygon((CHAMFER5_SIZE, 0), (0, -CHAMFER5_SIZE), (0, 0), align=None)
    chamfer5_piece_15b = extrude(amount=7.172995726, mode=Mode.PRIVATE)
    chamfer5_piece_15b = split(chamfer5_piece_15b, bisect_by=Plane(origin=(-8.328383402, 2, 3.792288058), z_dir=(0, 0, -1)), keep=Keep.TOP, mode=Mode.PRIVATE)
    chamfer5_piece_15 = chamfer5_piece_15a & chamfer5_piece_15b
    add(chamfer5_piece_15)
    with BuildSketch(Plane(origin=(-15.328383402, 2, -10.844640342), x_dir=(1, 0, 0), z_dir=(0, 0, 1))) as chamfer5_piece_16a_section:
        Polygon((CHAMFER5_SIZE, 0), (0, CHAMFER5_SIZE), (0, 0), align=None)
    chamfer5_piece_16a = extrude(amount=7.761433312, mode=Mode.PRIVATE)
    chamfer5_piece_16a = split(chamfer5_piece_16a, bisect_by=Plane(origin=(-15.328383402, 2, -8.272957354), z_dir=(0, 0, -1)), keep=Keep.TOP, mode=Mode.PRIVATE)
    with BuildSketch(Plane(origin=(-17.328383402, 2, -8.272957354), x_dir=(0, 0, -1), z_dir=(1, 0, 0))) as chamfer5_piece_16b_section:
        Polygon((CHAMFER5_SIZE, 0), (0, CHAMFER5_SIZE), (0, 0), align=None)
    chamfer5_piece_16b = extrude(amount=4.571682988, mode=Mode.PRIVATE)
    chamfer5_piece_16b = split(chamfer5_piece_16b, bisect_by=Plane(origin=(-15.328383402, 2, -8.272957354), z_dir=(1, 0, 0)), keep=Keep.TOP, mode=Mode.PRIVATE)
    chamfer5_piece_16 = chamfer5_piece_16a & chamfer5_piece_16b
    add(chamfer5_piece_16)
    with BuildSketch(Plane(origin=(-12.756700414, 2, -3.08320703), x_dir=(0, 0, 1), z_dir=(-1, 0, 0))) as chamfer5_piece_17a_section:
        Polygon((CHAMFER5_SIZE, 0), (0, CHAMFER5_SIZE), (0, 0), align=None)
    chamfer5_piece_17a = extrude(amount=4.571682988, mode=Mode.PRIVATE)
    chamfer5_piece_17a = split(chamfer5_piece_17a, bisect_by=Plane(origin=(-15.328383402, 2, -3.08320703), z_dir=(1, 0, 0)), keep=Keep.TOP, mode=Mode.PRIVATE)
    with BuildSketch(Plane(origin=(-15.328383402, 2, -8.272957354), x_dir=(1, 0, 0), z_dir=(0, 0, 1))) as chamfer5_piece_17b_section:
        Polygon((CHAMFER5_SIZE, 0), (0, CHAMFER5_SIZE), (0, 0), align=None)
    chamfer5_piece_17b = extrude(amount=7.761433312, mode=Mode.PRIVATE)
    chamfer5_piece_17b = split(chamfer5_piece_17b, bisect_by=Plane(origin=(-15.328383402, 2, -3.08320703), z_dir=(0, 0, 1)), keep=Keep.TOP, mode=Mode.PRIVATE)
    chamfer5_piece_17 = chamfer5_piece_17a & chamfer5_piece_17b
    add(chamfer5_piece_17)
    # the kernel refuses this chamfer: 1 mm, written as the material it takes off along each edge
    with BuildSketch(Plane(origin=(14.225985688, 12, -17.226428568), x_dir=(0, -1, 0), z_dir=(-1, 0, 0))) as chamfer5_2_piece_1:
        Polygon((CHAMFER5_SIZE, 0), (0, CHAMFER5_SIZE), (0, 0), align=None)
    extrude(amount=25.015884495, mode=Mode.SUBTRACT)
    with BuildSketch(Plane(origin=(14.223574861, 12, 5.792288058), x_dir=(0, -1, 0), z_dir=(-1, 0, 0))) as chamfer5_2_piece_2:
        Polygon((CHAMFER5_SIZE, 0), (0, -CHAMFER5_SIZE), (0, 0), align=None)
    extrude(amount=25.123641252, mode=Mode.SUBTRACT)
    with BuildSketch(Plane(origin=(-12.756700414, 4, -3.08320703), x_dir=(0, -1, 0), z_dir=(-1, 0, 0))) as chamfer5_2_piece_3:
        Polygon((CHAMFER5_SIZE, 0), (0, -CHAMFER5_SIZE), (0, 0), align=None)
    extrude(amount=7.143365976, mode=Mode.SUBTRACT)
    with BuildSketch(Plane(origin=(-19.90006639, 4, -8.272957354), x_dir=(0, 0, 1), z_dir=(1, 0, 0))) as chamfer5_2_piece_4:
        Polygon((CHAMFER5_SIZE, 0), (0, CHAMFER5_SIZE), (0, 0), align=None)
    extrude(amount=7.143365976, mode=Mode.SUBTRACT)


solid = part.part
